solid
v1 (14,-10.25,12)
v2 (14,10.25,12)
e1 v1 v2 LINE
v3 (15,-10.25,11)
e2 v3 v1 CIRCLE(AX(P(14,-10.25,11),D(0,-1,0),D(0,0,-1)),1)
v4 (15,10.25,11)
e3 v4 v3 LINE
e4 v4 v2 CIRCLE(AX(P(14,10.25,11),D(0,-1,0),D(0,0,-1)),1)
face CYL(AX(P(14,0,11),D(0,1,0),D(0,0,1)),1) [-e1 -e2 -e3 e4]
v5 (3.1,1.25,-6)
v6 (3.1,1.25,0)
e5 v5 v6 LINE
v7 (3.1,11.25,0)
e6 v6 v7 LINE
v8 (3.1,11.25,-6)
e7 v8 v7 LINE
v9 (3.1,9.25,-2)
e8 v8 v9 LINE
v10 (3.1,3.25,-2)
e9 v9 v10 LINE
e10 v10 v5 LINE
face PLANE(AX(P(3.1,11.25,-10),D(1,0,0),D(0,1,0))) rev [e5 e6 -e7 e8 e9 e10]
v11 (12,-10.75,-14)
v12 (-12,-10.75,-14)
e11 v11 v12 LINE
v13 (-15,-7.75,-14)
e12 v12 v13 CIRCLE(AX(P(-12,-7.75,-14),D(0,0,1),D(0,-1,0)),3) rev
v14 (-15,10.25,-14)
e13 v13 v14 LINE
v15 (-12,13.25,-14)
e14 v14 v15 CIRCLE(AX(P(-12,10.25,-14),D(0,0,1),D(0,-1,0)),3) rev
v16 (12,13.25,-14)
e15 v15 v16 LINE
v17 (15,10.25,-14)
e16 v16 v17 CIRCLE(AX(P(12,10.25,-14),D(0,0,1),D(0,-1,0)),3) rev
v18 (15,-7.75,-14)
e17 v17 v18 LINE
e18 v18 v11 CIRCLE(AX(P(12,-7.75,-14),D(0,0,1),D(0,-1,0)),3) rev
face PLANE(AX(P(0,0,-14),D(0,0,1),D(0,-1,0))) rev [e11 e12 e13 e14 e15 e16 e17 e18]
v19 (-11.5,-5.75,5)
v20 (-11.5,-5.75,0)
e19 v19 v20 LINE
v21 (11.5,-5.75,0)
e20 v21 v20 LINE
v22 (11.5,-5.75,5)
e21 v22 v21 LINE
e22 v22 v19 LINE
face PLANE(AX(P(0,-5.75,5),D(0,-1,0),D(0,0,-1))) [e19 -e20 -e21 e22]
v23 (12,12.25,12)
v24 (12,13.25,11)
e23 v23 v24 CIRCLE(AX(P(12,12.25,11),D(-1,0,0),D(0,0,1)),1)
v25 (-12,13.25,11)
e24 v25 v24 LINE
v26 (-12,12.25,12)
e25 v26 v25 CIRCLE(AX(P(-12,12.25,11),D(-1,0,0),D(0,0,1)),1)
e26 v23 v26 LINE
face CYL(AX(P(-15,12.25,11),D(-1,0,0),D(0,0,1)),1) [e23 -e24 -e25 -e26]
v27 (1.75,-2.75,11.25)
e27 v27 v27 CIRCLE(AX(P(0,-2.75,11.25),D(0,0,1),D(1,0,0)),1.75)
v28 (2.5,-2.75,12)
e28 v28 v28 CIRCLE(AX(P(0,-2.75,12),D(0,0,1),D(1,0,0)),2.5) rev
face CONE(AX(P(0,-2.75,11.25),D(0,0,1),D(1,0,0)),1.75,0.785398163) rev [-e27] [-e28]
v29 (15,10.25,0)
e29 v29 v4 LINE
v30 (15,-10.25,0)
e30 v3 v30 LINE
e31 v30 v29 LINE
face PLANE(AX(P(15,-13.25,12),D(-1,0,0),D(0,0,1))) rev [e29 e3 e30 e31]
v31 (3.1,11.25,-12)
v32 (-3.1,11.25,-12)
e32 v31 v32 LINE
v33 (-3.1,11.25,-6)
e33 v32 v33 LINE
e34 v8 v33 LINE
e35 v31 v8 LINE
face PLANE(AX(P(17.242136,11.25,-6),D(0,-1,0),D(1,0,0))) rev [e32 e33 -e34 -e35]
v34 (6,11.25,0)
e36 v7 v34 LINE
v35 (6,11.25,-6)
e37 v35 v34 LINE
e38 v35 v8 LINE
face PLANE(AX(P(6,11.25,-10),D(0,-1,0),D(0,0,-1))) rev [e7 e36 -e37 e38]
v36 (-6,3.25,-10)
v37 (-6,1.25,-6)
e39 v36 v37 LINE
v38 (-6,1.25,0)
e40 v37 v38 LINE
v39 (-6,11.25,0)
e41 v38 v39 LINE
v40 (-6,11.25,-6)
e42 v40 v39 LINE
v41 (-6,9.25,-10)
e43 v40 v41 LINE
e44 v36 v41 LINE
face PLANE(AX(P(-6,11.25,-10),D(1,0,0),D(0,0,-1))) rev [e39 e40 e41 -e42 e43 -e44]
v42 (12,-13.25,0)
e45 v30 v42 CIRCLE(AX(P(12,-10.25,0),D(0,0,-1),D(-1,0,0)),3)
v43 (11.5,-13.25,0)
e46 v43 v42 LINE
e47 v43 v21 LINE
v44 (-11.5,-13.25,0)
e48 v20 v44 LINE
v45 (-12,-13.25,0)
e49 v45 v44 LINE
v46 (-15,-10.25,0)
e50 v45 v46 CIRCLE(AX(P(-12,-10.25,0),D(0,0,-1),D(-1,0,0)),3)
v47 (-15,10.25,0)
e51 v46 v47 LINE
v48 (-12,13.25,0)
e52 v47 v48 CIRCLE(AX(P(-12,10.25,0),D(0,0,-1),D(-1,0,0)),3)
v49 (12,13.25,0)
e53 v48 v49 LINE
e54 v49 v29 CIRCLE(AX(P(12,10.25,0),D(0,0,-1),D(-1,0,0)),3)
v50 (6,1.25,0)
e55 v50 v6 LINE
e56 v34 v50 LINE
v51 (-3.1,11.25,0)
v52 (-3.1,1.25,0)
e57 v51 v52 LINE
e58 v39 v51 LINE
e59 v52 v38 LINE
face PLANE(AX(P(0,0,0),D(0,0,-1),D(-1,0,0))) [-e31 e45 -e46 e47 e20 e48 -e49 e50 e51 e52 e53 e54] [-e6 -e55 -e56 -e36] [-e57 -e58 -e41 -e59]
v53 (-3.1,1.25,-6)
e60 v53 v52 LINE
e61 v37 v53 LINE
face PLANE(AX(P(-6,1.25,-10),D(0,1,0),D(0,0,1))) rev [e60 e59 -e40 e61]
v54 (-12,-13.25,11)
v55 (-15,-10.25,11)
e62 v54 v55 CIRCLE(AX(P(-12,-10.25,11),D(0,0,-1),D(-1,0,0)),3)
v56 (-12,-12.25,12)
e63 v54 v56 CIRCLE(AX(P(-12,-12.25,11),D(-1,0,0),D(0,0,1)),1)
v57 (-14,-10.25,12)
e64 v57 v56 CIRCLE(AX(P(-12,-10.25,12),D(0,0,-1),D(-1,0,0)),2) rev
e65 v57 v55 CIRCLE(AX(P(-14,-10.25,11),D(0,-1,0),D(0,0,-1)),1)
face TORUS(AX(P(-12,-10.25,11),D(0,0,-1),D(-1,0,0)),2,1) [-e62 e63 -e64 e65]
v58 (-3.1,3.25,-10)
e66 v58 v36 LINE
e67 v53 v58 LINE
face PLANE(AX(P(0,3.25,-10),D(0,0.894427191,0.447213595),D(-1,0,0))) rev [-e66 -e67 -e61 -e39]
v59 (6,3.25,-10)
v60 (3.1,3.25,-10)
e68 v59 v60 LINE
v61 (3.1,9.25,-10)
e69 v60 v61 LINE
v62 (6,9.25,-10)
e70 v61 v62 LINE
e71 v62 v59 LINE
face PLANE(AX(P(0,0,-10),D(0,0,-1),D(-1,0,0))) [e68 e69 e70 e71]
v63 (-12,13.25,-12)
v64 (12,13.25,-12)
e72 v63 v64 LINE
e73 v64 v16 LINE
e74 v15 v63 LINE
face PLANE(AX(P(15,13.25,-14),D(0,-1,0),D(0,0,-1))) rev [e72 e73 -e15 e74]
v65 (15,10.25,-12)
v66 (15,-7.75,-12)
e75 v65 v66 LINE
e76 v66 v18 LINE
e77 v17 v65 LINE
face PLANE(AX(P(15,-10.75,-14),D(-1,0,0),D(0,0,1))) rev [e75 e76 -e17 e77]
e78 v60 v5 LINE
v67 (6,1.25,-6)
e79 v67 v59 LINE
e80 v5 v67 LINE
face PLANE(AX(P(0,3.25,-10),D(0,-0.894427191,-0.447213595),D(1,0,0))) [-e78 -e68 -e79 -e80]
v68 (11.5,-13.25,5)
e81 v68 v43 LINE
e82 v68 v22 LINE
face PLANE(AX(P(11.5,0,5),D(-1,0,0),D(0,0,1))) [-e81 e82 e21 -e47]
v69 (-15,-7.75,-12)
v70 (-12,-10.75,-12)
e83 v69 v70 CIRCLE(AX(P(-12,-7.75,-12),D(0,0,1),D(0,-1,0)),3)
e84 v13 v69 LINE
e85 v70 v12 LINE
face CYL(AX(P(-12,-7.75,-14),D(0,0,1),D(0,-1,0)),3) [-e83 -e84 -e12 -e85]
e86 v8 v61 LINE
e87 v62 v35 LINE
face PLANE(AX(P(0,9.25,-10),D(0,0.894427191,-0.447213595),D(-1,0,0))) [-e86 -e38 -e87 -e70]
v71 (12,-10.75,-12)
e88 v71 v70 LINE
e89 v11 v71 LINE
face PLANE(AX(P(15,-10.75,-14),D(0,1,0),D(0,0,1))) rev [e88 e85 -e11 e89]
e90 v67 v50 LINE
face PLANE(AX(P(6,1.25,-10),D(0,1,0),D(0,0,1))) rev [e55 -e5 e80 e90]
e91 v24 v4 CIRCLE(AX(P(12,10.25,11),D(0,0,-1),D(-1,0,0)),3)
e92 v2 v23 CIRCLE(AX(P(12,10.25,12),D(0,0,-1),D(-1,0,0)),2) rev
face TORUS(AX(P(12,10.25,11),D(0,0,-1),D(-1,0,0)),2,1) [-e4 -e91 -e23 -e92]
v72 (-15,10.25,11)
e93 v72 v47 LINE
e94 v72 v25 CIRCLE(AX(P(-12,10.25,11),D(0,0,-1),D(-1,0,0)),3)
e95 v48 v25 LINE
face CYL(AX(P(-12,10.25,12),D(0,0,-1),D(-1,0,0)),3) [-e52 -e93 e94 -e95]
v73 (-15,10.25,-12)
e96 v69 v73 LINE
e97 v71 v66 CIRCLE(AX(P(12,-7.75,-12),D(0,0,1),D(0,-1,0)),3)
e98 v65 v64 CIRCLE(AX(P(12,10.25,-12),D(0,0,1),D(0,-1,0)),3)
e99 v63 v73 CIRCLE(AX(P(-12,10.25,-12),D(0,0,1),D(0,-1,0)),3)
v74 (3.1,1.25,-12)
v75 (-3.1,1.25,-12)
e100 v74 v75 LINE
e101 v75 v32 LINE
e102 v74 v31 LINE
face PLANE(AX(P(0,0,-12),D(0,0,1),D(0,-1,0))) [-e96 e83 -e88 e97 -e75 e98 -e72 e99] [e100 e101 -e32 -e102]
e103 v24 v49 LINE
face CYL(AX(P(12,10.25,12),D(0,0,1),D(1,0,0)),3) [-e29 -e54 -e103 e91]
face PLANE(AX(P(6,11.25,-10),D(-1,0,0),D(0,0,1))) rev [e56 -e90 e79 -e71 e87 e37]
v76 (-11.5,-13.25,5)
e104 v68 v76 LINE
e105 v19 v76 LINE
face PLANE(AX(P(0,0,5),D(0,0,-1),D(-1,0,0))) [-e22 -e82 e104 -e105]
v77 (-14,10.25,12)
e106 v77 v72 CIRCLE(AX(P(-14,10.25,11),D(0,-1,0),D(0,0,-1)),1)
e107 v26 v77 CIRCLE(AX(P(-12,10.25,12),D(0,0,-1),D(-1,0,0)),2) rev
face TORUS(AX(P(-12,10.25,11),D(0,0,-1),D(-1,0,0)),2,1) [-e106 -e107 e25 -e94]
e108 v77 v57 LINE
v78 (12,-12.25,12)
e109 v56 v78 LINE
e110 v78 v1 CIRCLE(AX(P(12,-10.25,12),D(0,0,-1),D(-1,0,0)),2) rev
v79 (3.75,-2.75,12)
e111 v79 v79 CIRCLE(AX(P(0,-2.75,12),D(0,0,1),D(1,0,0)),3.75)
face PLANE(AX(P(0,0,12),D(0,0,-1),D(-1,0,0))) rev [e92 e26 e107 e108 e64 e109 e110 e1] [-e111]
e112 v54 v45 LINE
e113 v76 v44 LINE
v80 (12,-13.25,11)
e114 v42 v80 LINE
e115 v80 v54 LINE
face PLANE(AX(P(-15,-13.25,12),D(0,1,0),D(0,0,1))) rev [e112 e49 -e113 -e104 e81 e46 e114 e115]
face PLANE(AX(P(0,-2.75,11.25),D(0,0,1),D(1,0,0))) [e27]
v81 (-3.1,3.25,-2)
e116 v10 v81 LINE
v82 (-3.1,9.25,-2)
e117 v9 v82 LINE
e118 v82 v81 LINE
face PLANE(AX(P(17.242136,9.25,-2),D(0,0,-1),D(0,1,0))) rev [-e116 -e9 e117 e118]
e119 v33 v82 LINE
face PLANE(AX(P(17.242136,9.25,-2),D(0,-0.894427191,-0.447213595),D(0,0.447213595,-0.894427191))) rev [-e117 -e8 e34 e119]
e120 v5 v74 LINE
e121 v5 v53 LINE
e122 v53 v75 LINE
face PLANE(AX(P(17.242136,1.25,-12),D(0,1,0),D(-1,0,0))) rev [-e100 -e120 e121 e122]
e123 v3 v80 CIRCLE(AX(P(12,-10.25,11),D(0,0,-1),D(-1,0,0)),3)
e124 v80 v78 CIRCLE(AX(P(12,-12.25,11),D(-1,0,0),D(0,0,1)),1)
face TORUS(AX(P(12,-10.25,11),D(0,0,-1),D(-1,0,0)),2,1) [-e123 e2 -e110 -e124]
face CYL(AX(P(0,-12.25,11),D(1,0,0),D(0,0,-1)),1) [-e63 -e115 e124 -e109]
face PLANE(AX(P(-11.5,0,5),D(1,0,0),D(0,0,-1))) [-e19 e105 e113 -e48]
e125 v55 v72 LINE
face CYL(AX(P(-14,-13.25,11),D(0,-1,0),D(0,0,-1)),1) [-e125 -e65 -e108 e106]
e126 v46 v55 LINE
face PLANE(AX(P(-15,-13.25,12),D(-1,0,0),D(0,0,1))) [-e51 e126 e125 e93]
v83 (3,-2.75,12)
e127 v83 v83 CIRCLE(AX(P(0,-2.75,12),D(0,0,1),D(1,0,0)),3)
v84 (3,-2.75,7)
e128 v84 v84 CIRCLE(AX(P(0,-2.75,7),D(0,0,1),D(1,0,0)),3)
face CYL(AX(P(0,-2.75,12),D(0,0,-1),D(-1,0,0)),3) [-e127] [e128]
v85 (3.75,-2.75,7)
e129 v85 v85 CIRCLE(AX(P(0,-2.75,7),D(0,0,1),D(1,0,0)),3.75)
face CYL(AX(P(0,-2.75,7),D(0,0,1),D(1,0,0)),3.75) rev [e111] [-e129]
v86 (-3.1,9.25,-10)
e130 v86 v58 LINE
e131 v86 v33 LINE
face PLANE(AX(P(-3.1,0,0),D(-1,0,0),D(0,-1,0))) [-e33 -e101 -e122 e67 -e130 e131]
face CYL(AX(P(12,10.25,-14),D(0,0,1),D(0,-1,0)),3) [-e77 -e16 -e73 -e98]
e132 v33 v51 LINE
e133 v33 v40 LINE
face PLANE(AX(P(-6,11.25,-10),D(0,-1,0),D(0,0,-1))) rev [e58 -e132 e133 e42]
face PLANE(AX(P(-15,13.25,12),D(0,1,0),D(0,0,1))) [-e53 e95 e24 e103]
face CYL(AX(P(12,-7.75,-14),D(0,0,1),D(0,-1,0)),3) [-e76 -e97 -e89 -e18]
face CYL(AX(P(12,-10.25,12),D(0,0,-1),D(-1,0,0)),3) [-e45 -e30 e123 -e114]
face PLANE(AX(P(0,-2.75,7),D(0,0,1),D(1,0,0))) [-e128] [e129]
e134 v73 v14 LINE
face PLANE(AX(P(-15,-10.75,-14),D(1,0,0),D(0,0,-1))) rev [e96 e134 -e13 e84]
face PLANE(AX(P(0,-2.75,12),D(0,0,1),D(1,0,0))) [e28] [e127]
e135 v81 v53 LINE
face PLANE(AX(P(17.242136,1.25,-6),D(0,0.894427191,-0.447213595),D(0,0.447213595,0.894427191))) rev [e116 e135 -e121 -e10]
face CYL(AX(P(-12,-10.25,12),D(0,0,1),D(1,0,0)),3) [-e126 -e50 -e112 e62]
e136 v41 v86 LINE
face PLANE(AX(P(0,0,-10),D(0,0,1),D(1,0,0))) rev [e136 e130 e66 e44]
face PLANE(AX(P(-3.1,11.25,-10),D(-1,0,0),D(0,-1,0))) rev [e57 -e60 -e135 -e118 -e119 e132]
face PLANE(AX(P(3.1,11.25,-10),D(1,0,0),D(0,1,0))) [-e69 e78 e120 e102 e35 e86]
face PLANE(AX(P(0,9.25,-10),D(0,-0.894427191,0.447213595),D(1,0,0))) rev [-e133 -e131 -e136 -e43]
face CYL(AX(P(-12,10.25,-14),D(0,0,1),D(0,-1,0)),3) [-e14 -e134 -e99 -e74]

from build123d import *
from OCP.BRepFilletAPI import BRepFilletAPI_MakeChamfer

# Parameters (mm, degrees)
SKETCH1_W           = 30
SKETCH1_H           = 26.5
BOSS_EXTRUDE1_DEPTH = 12
FILLET1_R           = 3
FILLET2_R           = 1
SKETCH2_R           = 3.75
CUT_EXTRUDE1_DEPTH  = 5
SKETCH3_R           = 3
BOSS_EXTRUDE2_DEPTH = 5
SKETCH4_R           = 1.75
CUT_EXTRUDE2_DEPTH  = 0.75
CHAMFER1_SIZE       = 0.75
SKETCH5_W           = 2.9
SKETCH5_H           = 10
BOSS_EXTRUDE3_DEPTH = 10
CHAMFER2_SIZE       = 4
CHAMFER2_SIZE2      = 2
BOSS_EXTRUDE4_DEPTH = 6.2
SKETCH7_W           = 30
SKETCH7_H           = 24
BOSS_EXTRUDE5_DEPTH = 2
FILLET3_R           = 3
SKETCH8_W           = 11.5
SKETCH8_H           = 7.5
CUT_EXTRUDE3_DEPTH  = 5


with BuildPart() as part:
    # Sketch1 → Boss-Extrude1 (new body)
    with BuildSketch(Plane.XY):
        Rectangle(SKETCH1_W, SKETCH1_H)
    extrude(amount=BOSS_EXTRUDE1_DEPTH)

    # Fillet1
    fillet1_edges = [part.edges().sort_by_distance(p)[0] for p in [
        (-15, -13.25, 6),
        (15, -13.25, 6),
        (15, 13.25, 6),
        (-15, 13.25, 6),
    ]]
    fillet(fillet1_edges, radius=FILLET1_R)

    # Fillet2
    fillet2_edges = [part.edges().sort_by_distance(p)[0] for p in [
        (15, 0, 12),
        (0, -13.25, 12),
        (-15, 0, 12),
        (0, 13.25, 12),
        (-14.121320344, 12.371320344, 12),
        (14.121320344, 12.371320344, 12),
        (-14.121320344, -12.371320344, 12),
        (14.121320344, -12.371320344, 12),
    ]]
    fillet(fillet2_edges, radius=FILLET2_R)

    # Sketch2 → Cut-Extrude1 (cut)
    with BuildSketch(Plane.XY.offset(12)):
        with Locations((0, -2.75)):
            Circle(SKETCH2_R)
    extrude(amount=-CUT_EXTRUDE1_DEPTH, mode=Mode.SUBTRACT)

    # Sketch3 → Boss-Extrude2 (add)
    with BuildSketch(Plane.XY.offset(7)):
        with Locations((0, -2.75)):
            Circle(SKETCH3_R)
    extrude(amount=BOSS_EXTRUDE2_DEPTH)

    # Sketch4 → Cut-Extrude2 (cut)
    with BuildSketch(Plane.XY.offset(12)):
        with Locations((0, -2.75)):
            Circle(SKETCH4_R)
    extrude(amount=-CUT_EXTRUDE2_DEPTH, mode=Mode.SUBTRACT)

    # Chamfer1
    chamfer1_edges = [part.edges().sort_by_distance(p)[0] for p in [
        (-1.75, -2.75, 12),
    ]]
    chamfer(chamfer1_edges, length=CHAMFER1_SIZE - 0.0001)  # a hair under: the kernel refuses the full size

    # Sketch5 → Boss-Extrude3 (add)
    with BuildSketch(Plane(origin=(0, 0, 0), x_dir=(-1, 0, 0), z_dir=(0, 0, -1))):
        with Locations((-4.55, 6.25)):
            Rectangle(SKETCH5_W, SKETCH5_H)
        with Locations((4.55, 6.25)):
            Rectangle(SKETCH5_W, SKETCH5_H)
    extrude(amount=BOSS_EXTRUDE3_DEPTH)

    # Chamfer2: one chamfer whose edges measure the first distance from different faces: ONE call of the kernel's chamfer builder (chamfer() names one face for all edges)
    chamfer2_edges_1 = [part.edges().sort_by_distance(p)[0] for p in [
        (-4.55, 1.25, -10),
    ]]
    chamfer2_side_1 = [part.faces().sort_by_distance(p)[0] for p in [
        (-4.55, 1.25, -5),
    ]]
    chamfer2_edges_2 = [part.edges().sort_by_distance(p)[0] for p in [
        (4.55, 1.25, -10),
    ]]
    chamfer2_side_2 = [part.faces().sort_by_distance(p)[0] for p in [
        (4.55, 1.25, -5),
    ]]
    chamfer2_edges_3 = [part.edges().sort_by_distance(p)[0] for p in [
        (4.55, 11.25, -10),
    ]]
    chamfer2_side_3 = [part.faces().sort_by_distance(p)[0] for p in [
        (4.55, 11.25, -5),
    ]]
    chamfer2_edges_4 = [part.edges().sort_by_distance(p)[0] for p in [
        (-4.55, 11.25, -10),
    ]]
    chamfer2_side_4 = [part.faces().sort_by_distance(p)[0] for p in [
        (-4.55, 11.25, -5),
    ]]
    chamfer2 = BRepFilletAPI_MakeChamfer(part.part.solid().wrapped)
    for e in chamfer2_edges_1:
        chamfer2.Add(CHAMFER2_SIZE, CHAMFER2_SIZE2, e.wrapped, chamfer2_side_1[0].wrapped)  # the first distance lies on this face
    for e in chamfer2_edges_2:
        chamfer2.Add(CHAMFER2_SIZE, CHAMFER2_SIZE2, e.wrapped, chamfer2_side_2[0].wrapped)  # the first distance lies on this face
    for e in chamfer2_edges_3:
        chamfer2.Add(CHAMFER2_SIZE, CHAMFER2_SIZE2, e.wrapped, chamfer2_side_3[0].wrapped)  # the first distance lies on this face
    for e in chamfer2_edges_4:
        chamfer2.Add(CHAMFER2_SIZE, CHAMFER2_SIZE2, e.wrapped, chamfer2_side_4[0].wrapped)  # the first distance lies on this face
    add(Compound.cast(chamfer2.Shape()), mode=Mode.REPLACE)

    # Sketch6 → Boss-Extrude4 (add)
    with BuildSketch(Plane(origin=(-3.1, 0, 0), x_dir=(0, 0, -1), z_dir=(1, 0, 0))):
        Polygon((2, 9.25), (2, 3.25), (6, 1.25), (12, 1.25), (12, 11.25), (6, 11.25), align=None)
    extrude(amount=BOSS_EXTRUDE4_DEPTH)

    # Sketch7 → Boss-Extrude5 (add)
    with BuildSketch(Plane(origin=(0, 0, -12), x_dir=(-1, 0, 0), z_dir=(0, 0, -1))):
        with Locations((0, 1.25)):
            Rectangle(SKETCH7_W, SKETCH7_H)
    extrude(amount=BOSS_EXTRUDE5_DEPTH)

    # Fillet3
    fillet3_edges = [part.edges().sort_by_distance(p)[0] for p in [
        (-15, -10.75, -13),
        (-15, 13.25, -13),
        (15, 13.25, -13),
        (15, -10.75, -13),
    ]]
    fillet(fillet3_edges, radius=FILLET3_R)

    # Sketch8 → Cut-Extrude3 (cut)
    with BuildSketch(Plane(origin=(0, 0, 0), x_dir=(-1, 0, 0), z_dir=(0, 0, -1))):
        with Locations((5.75, -9.5)):
            Rectangle(SKETCH8_W, SKETCH8_H)
        with Locations((-5.75, -9.5)):
            Rectangle(SKETCH8_W, SKETCH8_H)
    extrude(amount=-CUT_EXTRUDE3_DEPTH, mode=Mode.SUBTRACT)


solid = part.part
